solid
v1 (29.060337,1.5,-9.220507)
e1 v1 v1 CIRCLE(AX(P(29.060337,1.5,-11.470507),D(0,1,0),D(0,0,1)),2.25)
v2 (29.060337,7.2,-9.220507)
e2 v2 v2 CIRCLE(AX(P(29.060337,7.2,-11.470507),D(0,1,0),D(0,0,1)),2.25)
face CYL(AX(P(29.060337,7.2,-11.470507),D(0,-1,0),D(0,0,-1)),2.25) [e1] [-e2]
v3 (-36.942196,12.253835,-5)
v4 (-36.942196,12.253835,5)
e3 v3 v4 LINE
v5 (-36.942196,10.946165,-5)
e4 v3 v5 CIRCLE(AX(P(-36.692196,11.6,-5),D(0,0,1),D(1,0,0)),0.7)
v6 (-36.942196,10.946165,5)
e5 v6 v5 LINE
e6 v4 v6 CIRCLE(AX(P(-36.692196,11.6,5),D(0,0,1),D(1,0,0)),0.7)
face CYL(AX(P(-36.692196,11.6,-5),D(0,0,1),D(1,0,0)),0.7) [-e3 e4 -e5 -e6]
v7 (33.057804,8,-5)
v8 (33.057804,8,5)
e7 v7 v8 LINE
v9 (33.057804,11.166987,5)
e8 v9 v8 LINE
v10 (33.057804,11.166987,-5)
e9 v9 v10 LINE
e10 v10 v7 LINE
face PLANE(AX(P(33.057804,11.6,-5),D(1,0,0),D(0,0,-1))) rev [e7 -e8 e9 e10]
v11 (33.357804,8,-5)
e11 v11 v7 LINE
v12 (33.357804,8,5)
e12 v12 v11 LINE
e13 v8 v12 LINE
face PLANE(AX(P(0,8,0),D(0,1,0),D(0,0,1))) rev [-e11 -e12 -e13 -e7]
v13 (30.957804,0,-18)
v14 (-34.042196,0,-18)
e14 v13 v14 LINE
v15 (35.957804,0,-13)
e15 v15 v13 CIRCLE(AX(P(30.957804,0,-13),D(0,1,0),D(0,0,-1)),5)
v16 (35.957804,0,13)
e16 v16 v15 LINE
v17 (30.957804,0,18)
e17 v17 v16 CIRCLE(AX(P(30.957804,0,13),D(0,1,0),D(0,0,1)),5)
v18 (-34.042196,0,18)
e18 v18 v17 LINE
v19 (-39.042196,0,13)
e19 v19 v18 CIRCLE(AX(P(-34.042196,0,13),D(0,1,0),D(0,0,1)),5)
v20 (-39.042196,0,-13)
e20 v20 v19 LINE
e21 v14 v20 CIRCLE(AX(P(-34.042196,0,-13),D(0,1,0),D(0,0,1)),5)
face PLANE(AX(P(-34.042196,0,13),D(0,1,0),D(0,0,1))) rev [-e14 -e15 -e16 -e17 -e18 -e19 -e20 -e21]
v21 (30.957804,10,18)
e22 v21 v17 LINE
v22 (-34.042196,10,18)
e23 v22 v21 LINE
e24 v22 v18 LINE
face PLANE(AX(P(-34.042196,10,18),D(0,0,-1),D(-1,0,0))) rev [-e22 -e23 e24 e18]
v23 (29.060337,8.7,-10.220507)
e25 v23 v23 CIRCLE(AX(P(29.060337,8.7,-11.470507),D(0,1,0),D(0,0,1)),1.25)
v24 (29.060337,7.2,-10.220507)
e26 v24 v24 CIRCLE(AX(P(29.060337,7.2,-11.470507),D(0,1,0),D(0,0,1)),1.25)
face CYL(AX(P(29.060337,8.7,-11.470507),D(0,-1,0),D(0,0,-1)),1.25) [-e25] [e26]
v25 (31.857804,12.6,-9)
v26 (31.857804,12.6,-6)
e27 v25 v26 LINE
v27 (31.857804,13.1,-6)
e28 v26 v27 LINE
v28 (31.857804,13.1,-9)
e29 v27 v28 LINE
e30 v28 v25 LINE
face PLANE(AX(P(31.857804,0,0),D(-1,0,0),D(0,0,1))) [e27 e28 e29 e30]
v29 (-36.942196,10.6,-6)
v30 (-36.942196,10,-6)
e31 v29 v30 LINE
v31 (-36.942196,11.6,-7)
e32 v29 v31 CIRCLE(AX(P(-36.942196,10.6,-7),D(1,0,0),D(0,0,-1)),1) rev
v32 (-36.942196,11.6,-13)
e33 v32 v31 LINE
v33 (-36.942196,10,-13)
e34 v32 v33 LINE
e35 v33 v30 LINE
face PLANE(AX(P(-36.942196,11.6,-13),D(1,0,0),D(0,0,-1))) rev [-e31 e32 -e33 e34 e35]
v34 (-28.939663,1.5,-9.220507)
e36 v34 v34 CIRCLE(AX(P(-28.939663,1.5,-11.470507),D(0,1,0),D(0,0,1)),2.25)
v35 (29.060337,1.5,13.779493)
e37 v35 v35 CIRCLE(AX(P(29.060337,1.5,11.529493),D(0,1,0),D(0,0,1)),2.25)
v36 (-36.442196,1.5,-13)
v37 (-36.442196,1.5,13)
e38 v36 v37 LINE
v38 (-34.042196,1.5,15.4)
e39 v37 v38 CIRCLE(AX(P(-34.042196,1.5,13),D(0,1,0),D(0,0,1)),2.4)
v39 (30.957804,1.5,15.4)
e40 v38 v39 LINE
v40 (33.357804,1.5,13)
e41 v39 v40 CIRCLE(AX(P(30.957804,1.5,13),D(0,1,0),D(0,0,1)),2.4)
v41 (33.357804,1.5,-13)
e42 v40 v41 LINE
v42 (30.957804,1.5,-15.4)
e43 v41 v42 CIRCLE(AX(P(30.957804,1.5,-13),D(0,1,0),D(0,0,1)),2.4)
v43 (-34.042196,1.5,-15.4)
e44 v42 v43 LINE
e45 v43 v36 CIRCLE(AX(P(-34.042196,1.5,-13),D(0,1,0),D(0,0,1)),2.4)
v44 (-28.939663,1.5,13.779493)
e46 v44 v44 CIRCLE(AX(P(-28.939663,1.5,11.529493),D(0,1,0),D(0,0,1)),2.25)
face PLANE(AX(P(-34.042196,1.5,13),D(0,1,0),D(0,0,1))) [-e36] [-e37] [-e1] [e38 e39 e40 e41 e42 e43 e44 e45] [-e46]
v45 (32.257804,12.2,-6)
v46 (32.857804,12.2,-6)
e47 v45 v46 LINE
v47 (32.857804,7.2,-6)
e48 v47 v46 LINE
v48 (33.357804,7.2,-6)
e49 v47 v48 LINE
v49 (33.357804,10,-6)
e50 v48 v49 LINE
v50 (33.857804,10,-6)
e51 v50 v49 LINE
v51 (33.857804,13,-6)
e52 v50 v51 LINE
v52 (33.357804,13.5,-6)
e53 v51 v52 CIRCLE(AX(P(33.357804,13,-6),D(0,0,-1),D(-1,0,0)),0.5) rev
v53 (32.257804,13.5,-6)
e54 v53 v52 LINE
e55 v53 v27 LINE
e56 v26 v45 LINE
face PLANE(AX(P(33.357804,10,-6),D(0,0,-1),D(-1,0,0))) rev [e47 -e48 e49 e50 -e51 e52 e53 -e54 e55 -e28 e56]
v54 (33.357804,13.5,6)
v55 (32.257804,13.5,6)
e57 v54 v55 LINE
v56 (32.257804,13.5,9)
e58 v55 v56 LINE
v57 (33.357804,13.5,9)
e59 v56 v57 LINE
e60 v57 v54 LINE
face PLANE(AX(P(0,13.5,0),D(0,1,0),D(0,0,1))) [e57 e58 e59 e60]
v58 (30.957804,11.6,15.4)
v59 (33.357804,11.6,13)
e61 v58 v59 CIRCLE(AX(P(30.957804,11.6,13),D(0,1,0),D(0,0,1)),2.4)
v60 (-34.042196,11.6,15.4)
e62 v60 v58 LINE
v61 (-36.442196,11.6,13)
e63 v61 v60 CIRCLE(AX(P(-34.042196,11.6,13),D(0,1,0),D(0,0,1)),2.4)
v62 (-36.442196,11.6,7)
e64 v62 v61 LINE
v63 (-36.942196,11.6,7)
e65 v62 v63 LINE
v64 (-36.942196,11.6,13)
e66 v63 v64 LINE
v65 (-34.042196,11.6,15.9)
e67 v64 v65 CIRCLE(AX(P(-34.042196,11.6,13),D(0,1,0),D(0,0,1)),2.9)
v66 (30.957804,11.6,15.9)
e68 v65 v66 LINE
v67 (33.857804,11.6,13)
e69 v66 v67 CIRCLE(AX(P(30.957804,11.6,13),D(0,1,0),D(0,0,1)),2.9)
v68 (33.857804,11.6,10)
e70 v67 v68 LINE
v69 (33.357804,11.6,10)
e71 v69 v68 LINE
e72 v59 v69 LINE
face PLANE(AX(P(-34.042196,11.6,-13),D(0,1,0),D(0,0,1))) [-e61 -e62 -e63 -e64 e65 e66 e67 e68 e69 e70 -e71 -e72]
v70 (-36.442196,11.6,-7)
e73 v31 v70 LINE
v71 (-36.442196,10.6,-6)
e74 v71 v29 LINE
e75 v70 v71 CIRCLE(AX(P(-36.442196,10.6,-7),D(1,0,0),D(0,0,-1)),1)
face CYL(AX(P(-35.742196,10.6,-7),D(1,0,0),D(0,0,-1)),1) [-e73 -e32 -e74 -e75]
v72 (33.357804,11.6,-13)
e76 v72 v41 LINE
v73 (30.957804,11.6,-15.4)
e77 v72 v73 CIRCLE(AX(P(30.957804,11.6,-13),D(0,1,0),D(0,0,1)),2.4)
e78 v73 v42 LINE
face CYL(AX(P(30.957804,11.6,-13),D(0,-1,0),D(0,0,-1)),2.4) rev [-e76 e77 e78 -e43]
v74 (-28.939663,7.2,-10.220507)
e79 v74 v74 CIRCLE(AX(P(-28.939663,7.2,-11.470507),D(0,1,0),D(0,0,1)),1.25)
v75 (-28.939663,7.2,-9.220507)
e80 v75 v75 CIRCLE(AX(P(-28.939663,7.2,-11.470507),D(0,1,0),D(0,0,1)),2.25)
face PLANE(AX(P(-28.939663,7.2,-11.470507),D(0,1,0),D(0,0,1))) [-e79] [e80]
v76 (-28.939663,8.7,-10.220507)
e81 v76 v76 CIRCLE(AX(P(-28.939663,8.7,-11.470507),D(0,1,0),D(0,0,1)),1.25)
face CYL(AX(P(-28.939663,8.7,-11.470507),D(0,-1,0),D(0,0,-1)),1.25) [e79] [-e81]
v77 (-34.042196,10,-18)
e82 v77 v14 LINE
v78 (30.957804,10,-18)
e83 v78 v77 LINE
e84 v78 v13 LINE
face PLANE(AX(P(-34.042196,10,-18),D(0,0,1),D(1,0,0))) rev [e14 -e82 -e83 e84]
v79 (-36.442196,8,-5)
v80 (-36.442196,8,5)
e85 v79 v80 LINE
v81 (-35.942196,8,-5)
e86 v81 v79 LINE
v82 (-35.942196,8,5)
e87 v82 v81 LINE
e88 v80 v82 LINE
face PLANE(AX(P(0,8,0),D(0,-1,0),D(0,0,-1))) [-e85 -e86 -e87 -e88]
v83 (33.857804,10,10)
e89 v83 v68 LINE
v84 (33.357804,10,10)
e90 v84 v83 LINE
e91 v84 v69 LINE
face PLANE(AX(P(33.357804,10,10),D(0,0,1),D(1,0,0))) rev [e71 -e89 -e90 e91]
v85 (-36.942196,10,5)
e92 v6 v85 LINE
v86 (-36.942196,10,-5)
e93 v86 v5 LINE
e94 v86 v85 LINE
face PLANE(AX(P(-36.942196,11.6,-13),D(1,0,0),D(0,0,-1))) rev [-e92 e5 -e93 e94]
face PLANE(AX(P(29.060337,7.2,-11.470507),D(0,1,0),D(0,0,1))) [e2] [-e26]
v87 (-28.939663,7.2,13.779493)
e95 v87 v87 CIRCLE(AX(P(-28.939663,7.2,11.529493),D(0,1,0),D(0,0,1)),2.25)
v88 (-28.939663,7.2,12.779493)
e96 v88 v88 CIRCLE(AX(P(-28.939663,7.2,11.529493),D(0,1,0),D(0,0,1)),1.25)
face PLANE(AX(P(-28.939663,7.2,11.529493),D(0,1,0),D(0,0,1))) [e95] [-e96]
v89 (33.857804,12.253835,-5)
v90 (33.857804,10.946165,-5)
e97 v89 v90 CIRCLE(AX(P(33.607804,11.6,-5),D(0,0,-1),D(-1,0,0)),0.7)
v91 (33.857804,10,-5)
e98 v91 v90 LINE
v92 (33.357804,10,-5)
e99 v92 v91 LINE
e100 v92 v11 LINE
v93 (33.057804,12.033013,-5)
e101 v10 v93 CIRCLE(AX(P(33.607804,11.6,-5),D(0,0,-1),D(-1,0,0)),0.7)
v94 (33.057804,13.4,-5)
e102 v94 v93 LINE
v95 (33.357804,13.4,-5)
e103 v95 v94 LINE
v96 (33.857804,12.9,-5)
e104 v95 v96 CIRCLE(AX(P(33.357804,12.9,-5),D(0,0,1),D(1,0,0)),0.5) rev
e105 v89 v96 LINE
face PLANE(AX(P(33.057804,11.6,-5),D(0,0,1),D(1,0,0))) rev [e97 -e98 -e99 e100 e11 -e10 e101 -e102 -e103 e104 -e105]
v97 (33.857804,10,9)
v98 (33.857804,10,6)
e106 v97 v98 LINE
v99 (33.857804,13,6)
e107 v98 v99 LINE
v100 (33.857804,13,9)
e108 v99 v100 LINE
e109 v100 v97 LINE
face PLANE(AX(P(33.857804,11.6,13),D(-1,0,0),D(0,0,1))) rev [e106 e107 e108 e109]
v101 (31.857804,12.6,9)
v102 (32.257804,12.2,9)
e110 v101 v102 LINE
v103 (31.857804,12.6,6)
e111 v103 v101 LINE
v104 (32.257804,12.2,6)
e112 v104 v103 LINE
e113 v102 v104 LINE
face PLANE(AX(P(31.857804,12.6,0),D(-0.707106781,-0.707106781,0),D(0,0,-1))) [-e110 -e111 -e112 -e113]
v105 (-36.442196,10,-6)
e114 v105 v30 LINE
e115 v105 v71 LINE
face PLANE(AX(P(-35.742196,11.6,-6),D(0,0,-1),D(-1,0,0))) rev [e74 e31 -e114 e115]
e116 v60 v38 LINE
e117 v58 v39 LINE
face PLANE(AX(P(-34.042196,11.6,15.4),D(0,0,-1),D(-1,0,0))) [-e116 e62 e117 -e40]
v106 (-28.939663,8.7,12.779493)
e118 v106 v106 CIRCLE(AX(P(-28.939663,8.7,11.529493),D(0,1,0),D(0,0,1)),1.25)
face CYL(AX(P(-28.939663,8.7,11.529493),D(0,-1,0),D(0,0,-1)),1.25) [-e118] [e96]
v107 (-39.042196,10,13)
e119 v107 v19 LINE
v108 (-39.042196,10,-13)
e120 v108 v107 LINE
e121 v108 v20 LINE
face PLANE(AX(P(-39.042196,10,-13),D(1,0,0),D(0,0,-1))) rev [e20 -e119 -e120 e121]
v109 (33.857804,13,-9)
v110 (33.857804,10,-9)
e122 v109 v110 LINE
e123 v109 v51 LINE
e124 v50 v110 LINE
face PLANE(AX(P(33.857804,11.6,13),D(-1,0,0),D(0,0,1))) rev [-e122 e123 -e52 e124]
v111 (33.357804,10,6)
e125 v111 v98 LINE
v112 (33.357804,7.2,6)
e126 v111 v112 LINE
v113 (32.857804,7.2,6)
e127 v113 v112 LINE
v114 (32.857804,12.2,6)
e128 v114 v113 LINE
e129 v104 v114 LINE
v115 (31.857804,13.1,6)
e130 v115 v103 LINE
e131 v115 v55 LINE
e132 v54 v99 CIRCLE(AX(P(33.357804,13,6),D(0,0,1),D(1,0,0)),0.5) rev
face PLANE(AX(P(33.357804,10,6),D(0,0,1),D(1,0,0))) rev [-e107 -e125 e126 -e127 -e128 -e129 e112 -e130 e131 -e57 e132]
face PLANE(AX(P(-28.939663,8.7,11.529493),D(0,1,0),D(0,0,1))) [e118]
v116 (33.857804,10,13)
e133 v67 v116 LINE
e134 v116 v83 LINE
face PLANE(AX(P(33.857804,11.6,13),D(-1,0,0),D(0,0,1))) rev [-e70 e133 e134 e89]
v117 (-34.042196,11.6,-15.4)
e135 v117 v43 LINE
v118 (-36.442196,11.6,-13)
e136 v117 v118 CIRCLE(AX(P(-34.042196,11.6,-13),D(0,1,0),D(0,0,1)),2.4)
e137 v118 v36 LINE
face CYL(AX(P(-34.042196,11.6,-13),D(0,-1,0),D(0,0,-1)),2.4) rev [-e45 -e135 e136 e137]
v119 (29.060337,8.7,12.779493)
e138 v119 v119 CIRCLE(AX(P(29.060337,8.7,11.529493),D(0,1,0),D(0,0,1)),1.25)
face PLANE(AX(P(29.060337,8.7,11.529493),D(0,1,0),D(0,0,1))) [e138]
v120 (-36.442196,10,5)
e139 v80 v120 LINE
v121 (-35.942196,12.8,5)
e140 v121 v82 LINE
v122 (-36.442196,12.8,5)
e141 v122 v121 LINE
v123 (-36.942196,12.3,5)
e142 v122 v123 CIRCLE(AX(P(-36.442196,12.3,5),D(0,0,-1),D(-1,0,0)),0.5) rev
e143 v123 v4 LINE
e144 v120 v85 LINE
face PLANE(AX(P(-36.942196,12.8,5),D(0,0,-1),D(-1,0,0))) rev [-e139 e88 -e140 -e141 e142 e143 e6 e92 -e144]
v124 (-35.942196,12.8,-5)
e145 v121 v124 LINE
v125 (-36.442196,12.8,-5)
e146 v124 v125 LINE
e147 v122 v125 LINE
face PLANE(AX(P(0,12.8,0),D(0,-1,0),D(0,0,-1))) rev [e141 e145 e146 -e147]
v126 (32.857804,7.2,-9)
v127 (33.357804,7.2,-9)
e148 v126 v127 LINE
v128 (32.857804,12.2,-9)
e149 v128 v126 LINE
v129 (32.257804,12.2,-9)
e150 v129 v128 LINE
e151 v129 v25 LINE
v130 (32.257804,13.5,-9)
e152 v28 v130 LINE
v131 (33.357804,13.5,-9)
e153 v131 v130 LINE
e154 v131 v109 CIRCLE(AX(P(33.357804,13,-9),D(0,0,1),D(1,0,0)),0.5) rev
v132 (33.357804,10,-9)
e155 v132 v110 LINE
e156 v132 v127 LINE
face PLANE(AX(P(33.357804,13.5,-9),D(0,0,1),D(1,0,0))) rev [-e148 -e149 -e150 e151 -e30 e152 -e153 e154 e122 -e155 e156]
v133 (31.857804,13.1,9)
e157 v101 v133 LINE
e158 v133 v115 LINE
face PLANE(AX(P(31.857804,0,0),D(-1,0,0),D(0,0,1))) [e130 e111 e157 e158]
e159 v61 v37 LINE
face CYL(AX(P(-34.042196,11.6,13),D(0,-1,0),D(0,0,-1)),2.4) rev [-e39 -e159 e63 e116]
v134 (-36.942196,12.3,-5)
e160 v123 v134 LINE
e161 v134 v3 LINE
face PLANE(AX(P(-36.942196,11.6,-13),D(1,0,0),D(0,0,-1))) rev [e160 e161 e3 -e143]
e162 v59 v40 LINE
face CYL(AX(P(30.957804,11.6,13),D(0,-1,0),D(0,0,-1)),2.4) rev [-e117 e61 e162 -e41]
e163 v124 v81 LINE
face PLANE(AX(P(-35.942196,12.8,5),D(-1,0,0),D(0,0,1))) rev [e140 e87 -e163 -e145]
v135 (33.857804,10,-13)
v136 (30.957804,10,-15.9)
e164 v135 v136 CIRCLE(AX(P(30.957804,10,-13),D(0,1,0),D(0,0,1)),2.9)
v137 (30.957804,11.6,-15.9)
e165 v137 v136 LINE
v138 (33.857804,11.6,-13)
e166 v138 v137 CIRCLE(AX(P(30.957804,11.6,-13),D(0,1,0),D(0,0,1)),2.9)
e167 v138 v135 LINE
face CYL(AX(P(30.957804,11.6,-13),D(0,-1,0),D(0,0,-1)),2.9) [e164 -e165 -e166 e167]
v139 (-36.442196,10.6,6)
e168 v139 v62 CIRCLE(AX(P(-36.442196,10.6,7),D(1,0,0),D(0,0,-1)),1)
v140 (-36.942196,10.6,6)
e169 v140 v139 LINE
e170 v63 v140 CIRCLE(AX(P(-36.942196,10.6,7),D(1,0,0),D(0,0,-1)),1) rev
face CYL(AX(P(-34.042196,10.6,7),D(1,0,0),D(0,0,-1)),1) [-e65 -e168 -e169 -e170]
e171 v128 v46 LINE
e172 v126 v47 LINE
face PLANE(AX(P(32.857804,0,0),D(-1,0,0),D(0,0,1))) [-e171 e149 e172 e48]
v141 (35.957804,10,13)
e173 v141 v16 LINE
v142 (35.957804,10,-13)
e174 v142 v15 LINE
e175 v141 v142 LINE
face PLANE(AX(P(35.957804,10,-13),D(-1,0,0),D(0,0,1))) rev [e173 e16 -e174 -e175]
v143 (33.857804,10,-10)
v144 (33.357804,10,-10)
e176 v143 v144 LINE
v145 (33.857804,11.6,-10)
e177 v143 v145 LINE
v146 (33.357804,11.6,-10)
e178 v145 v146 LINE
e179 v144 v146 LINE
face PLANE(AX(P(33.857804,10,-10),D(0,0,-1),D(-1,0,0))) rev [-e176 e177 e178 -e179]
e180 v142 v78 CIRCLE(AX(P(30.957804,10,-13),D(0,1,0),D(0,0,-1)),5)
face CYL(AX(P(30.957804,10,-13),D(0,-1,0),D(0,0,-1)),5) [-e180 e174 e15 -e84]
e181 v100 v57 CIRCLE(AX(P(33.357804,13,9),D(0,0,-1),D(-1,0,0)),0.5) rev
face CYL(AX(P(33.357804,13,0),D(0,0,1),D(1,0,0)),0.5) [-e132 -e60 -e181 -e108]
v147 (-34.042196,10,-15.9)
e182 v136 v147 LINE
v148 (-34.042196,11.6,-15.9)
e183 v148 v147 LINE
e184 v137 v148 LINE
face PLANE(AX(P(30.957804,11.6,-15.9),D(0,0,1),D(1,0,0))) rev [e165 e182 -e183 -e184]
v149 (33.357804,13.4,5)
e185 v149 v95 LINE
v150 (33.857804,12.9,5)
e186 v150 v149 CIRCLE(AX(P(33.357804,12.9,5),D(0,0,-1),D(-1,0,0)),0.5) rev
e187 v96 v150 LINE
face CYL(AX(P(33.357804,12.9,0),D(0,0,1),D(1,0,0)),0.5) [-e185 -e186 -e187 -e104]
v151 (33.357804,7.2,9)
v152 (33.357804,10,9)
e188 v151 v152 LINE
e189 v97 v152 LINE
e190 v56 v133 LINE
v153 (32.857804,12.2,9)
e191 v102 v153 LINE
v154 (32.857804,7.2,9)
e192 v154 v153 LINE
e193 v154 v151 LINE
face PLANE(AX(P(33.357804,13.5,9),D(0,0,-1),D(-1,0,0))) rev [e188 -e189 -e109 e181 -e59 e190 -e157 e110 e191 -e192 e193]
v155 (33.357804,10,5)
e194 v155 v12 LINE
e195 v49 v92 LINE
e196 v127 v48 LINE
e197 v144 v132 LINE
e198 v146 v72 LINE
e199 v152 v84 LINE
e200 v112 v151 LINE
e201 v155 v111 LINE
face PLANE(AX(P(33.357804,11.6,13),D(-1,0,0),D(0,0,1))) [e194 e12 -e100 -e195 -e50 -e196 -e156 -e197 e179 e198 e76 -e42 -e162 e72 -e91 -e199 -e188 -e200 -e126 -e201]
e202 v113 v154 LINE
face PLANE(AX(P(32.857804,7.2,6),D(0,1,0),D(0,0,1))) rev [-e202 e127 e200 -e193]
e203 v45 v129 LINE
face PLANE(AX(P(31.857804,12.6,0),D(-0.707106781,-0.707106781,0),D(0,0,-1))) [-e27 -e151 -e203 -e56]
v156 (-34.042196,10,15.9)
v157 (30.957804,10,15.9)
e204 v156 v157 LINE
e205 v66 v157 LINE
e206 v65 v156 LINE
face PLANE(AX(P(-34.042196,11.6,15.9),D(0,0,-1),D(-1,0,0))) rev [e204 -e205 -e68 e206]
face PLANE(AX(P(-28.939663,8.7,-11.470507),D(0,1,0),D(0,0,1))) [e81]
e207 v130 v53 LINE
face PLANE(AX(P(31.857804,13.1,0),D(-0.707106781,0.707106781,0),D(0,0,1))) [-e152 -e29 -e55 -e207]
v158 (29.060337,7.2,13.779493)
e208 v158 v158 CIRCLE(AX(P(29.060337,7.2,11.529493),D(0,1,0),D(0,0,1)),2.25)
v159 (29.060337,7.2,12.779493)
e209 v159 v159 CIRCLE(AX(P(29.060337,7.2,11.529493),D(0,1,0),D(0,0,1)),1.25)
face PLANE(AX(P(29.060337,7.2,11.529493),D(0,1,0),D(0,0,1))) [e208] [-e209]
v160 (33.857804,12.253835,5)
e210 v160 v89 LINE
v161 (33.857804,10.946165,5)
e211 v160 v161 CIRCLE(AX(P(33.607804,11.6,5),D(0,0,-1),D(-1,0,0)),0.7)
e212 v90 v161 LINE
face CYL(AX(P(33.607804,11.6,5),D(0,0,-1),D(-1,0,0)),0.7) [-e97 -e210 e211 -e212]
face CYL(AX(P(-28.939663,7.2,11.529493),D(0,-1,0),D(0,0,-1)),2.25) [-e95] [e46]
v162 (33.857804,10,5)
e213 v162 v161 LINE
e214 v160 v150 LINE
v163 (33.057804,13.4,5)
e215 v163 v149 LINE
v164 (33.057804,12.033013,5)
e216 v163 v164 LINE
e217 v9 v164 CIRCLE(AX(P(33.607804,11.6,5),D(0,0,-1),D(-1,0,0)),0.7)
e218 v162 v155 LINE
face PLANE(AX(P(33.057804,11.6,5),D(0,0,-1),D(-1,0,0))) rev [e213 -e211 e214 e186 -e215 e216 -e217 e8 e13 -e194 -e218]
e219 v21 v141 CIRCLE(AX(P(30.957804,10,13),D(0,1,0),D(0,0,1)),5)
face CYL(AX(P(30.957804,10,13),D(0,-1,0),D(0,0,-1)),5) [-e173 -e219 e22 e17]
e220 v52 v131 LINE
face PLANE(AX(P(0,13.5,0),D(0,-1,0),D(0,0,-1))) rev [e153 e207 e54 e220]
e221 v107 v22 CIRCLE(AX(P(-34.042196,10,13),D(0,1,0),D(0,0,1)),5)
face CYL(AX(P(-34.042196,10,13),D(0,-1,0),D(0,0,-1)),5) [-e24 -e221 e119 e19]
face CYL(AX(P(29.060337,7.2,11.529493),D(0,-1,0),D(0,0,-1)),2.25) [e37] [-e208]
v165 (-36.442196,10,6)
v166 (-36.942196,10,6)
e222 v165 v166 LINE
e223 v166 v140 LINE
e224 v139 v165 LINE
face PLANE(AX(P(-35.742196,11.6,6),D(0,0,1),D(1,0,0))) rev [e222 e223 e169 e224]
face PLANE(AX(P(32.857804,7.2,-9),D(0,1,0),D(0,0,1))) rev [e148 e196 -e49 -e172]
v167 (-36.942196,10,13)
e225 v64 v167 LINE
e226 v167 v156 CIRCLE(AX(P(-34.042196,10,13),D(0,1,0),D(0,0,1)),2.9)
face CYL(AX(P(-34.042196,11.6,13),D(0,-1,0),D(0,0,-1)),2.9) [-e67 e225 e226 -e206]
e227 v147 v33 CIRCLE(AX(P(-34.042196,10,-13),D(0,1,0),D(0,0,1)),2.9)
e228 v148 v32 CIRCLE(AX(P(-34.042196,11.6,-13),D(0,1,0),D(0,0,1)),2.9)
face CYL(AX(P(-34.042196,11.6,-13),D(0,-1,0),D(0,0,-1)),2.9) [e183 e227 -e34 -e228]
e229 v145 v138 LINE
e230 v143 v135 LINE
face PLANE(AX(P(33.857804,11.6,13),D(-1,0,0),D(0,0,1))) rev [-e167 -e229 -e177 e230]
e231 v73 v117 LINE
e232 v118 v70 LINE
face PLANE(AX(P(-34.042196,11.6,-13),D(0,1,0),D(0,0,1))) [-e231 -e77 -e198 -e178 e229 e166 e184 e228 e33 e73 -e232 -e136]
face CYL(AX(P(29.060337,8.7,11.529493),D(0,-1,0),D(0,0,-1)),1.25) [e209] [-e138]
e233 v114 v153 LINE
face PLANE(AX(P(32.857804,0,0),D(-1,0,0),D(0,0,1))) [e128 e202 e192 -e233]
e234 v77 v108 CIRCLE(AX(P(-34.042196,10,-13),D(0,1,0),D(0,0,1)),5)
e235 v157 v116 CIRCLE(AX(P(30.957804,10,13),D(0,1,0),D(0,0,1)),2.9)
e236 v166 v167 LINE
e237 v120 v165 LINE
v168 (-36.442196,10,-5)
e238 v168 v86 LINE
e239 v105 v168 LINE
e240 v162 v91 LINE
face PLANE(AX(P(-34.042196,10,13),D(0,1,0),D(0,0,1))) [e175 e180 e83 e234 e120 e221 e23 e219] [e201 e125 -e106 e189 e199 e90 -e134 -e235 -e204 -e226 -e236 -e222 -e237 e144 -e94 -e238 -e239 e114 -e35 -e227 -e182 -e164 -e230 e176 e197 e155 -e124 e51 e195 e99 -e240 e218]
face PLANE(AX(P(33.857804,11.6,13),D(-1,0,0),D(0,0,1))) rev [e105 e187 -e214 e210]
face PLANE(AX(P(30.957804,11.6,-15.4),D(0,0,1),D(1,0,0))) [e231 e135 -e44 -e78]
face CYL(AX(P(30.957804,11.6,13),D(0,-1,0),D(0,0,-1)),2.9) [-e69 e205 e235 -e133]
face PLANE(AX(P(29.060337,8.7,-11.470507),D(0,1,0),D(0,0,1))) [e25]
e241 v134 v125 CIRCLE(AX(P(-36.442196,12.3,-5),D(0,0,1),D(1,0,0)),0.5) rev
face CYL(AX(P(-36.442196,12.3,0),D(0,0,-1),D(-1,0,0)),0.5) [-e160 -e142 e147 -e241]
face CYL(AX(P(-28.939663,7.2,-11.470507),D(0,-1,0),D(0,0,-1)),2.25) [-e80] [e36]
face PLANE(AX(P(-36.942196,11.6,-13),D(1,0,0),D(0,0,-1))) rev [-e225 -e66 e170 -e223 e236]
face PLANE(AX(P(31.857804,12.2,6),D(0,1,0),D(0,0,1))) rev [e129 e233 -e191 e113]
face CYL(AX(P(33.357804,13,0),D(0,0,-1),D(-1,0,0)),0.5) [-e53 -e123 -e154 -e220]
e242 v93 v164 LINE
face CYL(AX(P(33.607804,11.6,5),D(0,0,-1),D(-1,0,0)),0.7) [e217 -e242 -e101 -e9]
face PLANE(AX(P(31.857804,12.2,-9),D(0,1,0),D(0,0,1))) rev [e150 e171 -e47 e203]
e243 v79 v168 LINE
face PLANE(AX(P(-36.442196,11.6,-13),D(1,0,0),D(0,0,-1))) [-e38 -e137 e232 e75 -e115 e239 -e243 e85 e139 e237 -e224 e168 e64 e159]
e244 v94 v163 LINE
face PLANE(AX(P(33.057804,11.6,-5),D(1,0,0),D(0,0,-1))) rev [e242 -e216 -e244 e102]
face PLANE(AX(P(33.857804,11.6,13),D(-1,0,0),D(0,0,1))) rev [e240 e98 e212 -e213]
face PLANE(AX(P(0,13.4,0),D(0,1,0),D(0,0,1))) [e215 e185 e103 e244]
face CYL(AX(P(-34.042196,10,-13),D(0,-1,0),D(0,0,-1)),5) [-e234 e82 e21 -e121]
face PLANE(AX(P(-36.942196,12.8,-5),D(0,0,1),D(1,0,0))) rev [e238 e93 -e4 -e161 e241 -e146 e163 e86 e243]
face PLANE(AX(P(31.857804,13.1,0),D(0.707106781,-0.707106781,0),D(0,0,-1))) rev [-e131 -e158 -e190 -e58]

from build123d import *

# Parameters (mm, degrees)
EXTRUDE_2_DEPTH       = 10
EXTRUDE_4_DEPTH       = 1.6
SKETCH_7_W            = 0.5
SKETCH_7_H            = 10
EXTRUDE_8_DEPTH       = 2.8
SKETCH_8_R            = 0.7
EXTRUDE_9_DEPTH       = 10
FILLET_1_R            = 0.5
SKETCH_11_W           = 1
SKETCH_11_H           = 1.6
CUT_EXTRUDE_1_DEPTH   = 1.2
FILLET_2_R            = 1
SKETCH_13_W           = 0.5
SKETCH_13_H           = 10
EXTRUDE_10_DEPTH      = 2.8
CUT_EXTRUDE_START     = -8.5
CUT_EXTRUDE_2_DEPTH   = 8.5
SKETCH_13_2_W         = 0.5
SKETCH_13_2_H         = 10
EXTRUDE_11_DEPTH      = 2
EXTRUDE_12_DEPTH      = 1.6
EXTRUDE_12_DEPTH_BACK = 2
SKETCH_5_W            = 0.3
SKETCH_5_H            = 10
SKETCH_15_R           = 2.25
EXTRUDE_13_DEPTH      = 5.7
SKETCH_16_R           = 1.25
EXTRUDE_14_DEPTH      = 1.5
SKETCH_17_W           = 0.5
SKETCH_17_H           = 1
CUT_EXTRUDE_3_DEPTH   = 1.6
SKETCH_19_W           = 0.8
SKETCH_19_H           = 10
EXTRUDE_15_DEPTH      = 1.8
SKETCH_20_R           = 0.7
EXTRUDE_16_DEPTH      = 10
FILLET_4_R            = 0.5
SKETCH_21_W           = 0.5
SKETCH_21_H           = 3
EXTRUDE_17_DEPTH      = 1.9
SKETCH_22_W           = 3
SKETCH_22_H           = 6.3
EXTRUDE_23_DEPTH      = 0.5
FILLET_12_R           = 0.5
SKETCH_29_W           = 0.5
SKETCH_29_H           = 1
CUT_EXTRUDE_5_DEPTH   = 1.6
SKETCH_30_W           = 3
SKETCH_30_H           = 1.3
EXTRUDE_26_DEPTH      = 1
CHAMFER_7_SIZE        = 0.4


with BuildPart() as part:
    # case 2 → 凸台-拉伸2 (new body)
    with BuildSketch(Plane(origin=(0, 0, 0), x_dir=(1, 0, 0), z_dir=(0, 1, 0))):
        with BuildLine():
            Line((-34.042196447, 18), (30.957803553, 18))
            ThreePointArc((30.957803553, 18), (34.493337459, 16.535533906), (35.957803553, 13))
            Line((35.957803553, 13), (35.957803553, -13))
            ThreePointArc((35.957803553, -13), (34.493337459, -16.535533906), (30.957803553, -18))
            Line((30.957803553, -18), (-34.042196447, -18))
            ThreePointArc((-34.042196447, -18), (-37.577730353, -16.535533906), (-39.042196447, -13))
            Line((-39.042196447, -13), (-39.042196447, 13))
            ThreePointArc((-39.042196447, 13), (-37.577730353, 16.535533906), (-34.042196447, 18))
        make_face()
    extrude(amount=EXTRUDE_2_DEPTH)

    # 草图3 → 凸台-拉伸4 (add)
    with BuildSketch(Plane(origin=(0, 10, 0), x_dir=(1, 0, 0), z_dir=(0, 1, 0))):
        with BuildLine():
            Line((-36.942196447, 13), (-36.942196447, -13))
            ThreePointArc((-36.942196447, -13), (-36.092806113, -15.050609665), (-34.042196447, -15.9))
            Line((-34.042196447, -15.9), (30.957803553, -15.9))
            ThreePointArc((30.957803553, -15.9), (33.008413218, -15.050609665), (33.857803553, -13))
            Line((33.857803553, -13), (33.857803553, 13))
            ThreePointArc((33.857803553, 13), (33.008413218, 15.050609665), (30.957803553, 15.9))
            Line((30.957803553, 15.9), (-34.042196447, 15.9))
            ThreePointArc((-34.042196447, 15.9), (-36.092806113, 15.050609665), (-36.942196447, 13))
        make_face()
        with BuildLine():
            Line((-34.042196447, -15.4), (30.957803553, -15.4))
            ThreePointArc((30.957803553, -15.4), (32.654859828, -14.697056275), (33.357803553, -13))
            Line((33.357803553, -13), (33.357803553, 13))
            ThreePointArc((33.357803553, 13), (32.654859828, 14.697056275), (30.957803553, 15.4))
            Line((30.957803553, 15.4), (-34.042196447, 15.4))
            ThreePointArc((-34.042196447, 15.4), (-35.739252722, 14.697056275), (-36.442196447, 13))
            Line((-36.442196447, 13), (-36.442196447, -13))
            ThreePointArc((-36.442196447, -13), (-35.739252722, -14.697056275), (-34.042196447, -15.4))
        make_face(mode=Mode.SUBTRACT)
    extrude(amount=EXTRUDE_4_DEPTH)

    # 草图7 → 凸台-拉伸8 (add)
    with BuildSketch(Plane(origin=(0, 10, 0), x_dir=(1, 0, 0), z_dir=(0, 1, 0))):
        with Locations((-36.692196447, 0)):
            Rectangle(SKETCH_7_W, SKETCH_7_H)
    extrude(amount=EXTRUDE_8_DEPTH)

    # 草图8 → 凸台-拉伸9 (add)
    with BuildSketch(Plane.XY.offset(5)):
        with Locations((-36.692196447, 11.6)):
            Circle(SKETCH_8_R)
    extrude(amount=-EXTRUDE_9_DEPTH)

    # 圆角1
    fillet_1_edges = [part.edges().sort_by_distance(p)[0] for p in [
        (-36.942196447, 12.8, 0),
    ]]
    fillet(fillet_1_edges, radius=FILLET_1_R - 0.0001)  # a hair under: the kernel refuses the full size

    # 草图11 → 切除-拉伸1 (cut)
    with BuildSketch(Plane.ZY.offset(36.942196447)):
        with Locations((5.5, 10.8)):
            Rectangle(SKETCH_11_W, SKETCH_11_H)
        with Locations((-5.5, 10.8)):
            Rectangle(SKETCH_11_W, SKETCH_11_H)
    extrude(amount=-CUT_EXTRUDE_1_DEPTH, mode=Mode.SUBTRACT)

    # 圆角2
    fillet_2_edges = [part.edges().sort_by_distance(p)[0] for p in [
        (-36.692196447, 11.6, 6),
        (-36.692196447, 11.6, -6),
    ]]
    fillet(fillet_2_edges, radius=FILLET_2_R)

    # 草图13 → 凸台-拉伸10 (add)
    with BuildSketch(Plane(origin=(0, 10, 0), x_dir=(1, 0, 0), z_dir=(0, 1, 0))):
        with Locations((-36.192196447, 0)):
            Rectangle(SKETCH_13_W, SKETCH_13_H)
    extrude(amount=EXTRUDE_10_DEPTH)

    # 草图14 → 切除-拉伸2 (cut)
    with BuildSketch(Plane(origin=(0, 10, 0), x_dir=(1, 0, 0), z_dir=(0, 1, 0)).offset(CUT_EXTRUDE_START)):
        with BuildLine():
            Line((-34.042196447, -15.4), (30.957803553, -15.4))
            ThreePointArc((30.957803553, -15.4), (32.654859828, -14.697056275), (33.357803553, -13))
            Line((33.357803553, -13), (33.357803553, 13))
            ThreePointArc((33.357803553, 13), (32.654859828, 14.697056275), (30.957803553, 15.4))
            Line((30.957803553, 15.4), (-34.042196447, 15.4))
            ThreePointArc((-34.042196447, 15.4), (-35.739252722, 14.697056275), (-36.442196447, 13))
            Line((-36.442196447, 13), (-36.442196447, -13))
            ThreePointArc((-36.442196447, -13), (-35.739252722, -14.697056275), (-34.042196447, -15.4))
        make_face()
    extrude(amount=CUT_EXTRUDE_2_DEPTH, mode=Mode.SUBTRACT)

    # 草图13<2> → 凸台-拉伸11 (add)
    with BuildSketch(Plane(origin=(0, 10, 0), x_dir=(1, 0, 0), z_dir=(0, 1, 0))):
        with Locations((-36.192196447, 0)):
            Rectangle(SKETCH_13_2_W, SKETCH_13_2_H)
    extrude(amount=-EXTRUDE_11_DEPTH)

    # 草图5 → 凸台-拉伸12 (add, two sides: drawn at the far end of the back side and taken through both)
    with BuildSketch(Plane(origin=(0, 10, 0), x_dir=(1, 0, 0), z_dir=(0, 1, 0)).offset(-EXTRUDE_12_DEPTH_BACK)):
        with Locations((33.207803553, 0)):
            Rectangle(SKETCH_5_W, SKETCH_5_H)
    extrude(amount=EXTRUDE_12_DEPTH + EXTRUDE_12_DEPTH_BACK)

    # 草图15 → 凸台-拉伸13 (add)
    with BuildSketch(Plane(origin=(0, 1.5, 0), x_dir=(1, 0, 0), z_dir=(0, 1, 0))):
        with Locations(Location((29.060337171, -11.529492838, 0), (0, 0, 270))):
            Circle(SKETCH_15_R)
        with Locations(Location((-28.939662829, -11.529492838, 0), (0, 0, 270))):
            Circle(SKETCH_15_R)
        with Locations(Location((29.060337171, 11.470507162, 0), (0, 0, 270))):
            Circle(SKETCH_15_R)
        with Locations(Location((-28.939662829, 11.470507162, 0), (0, 0, 270))):
            Circle(SKETCH_15_R)
    extrude(amount=EXTRUDE_13_DEPTH)

    # 草图16 → 凸台-拉伸14 (add)
    with BuildSketch(Plane(origin=(0, 7.2, 0), x_dir=(1, 0, 0), z_dir=(0, 1, 0))):
        with Locations(Location((29.060337171, -11.529492838, 0), (0, 0, 270))):
            Circle(SKETCH_16_R)
        with Locations(Location((29.060337171, 11.470507162, 0), (0, 0, 270))):
            Circle(SKETCH_16_R)
        with Locations(Location((-28.939662829, -11.529492838, 0), (0, 0, 270))):
            Circle(SKETCH_16_R)
        with Locations(Location((-28.939662829, 11.470507162, 0), (0, 0, 270))):
            Circle(SKETCH_16_R)
    extrude(amount=EXTRUDE_14_DEPTH)

    # 草图17 → 切除-拉伸3 (cut)
    with BuildSketch(Plane(origin=(0, 11.6, 0), x_dir=(1, 0, 0), z_dir=(0, 1, 0))):
        with Locations((33.607803553, -5.5)):
            Rectangle(SKETCH_17_W, SKETCH_17_H)
        with Locations((33.607803553, 5.5)):
            Rectangle(SKETCH_17_W, SKETCH_17_H)
    extrude(amount=-CUT_EXTRUDE_3_DEPTH, mode=Mode.SUBTRACT)

    # 草图19 → 凸台-拉伸15 (add)
    with BuildSketch(Plane(origin=(0, 11.6, 0), x_dir=(1, 0, 0), z_dir=(0, 1, 0))):
        with Locations((33.457803553, 0)):
            Rectangle(SKETCH_19_W, SKETCH_19_H)
    extrude(amount=EXTRUDE_15_DEPTH)

    # 草图20 → 凸台-拉伸16 (add)
    with BuildSketch(Plane(origin=(0, 0, -5), x_dir=(-1, 0, 0), z_dir=(0, 0, -1))):
        with Locations((-33.607803553, 11.6)):
            Circle(SKETCH_20_R)
    extrude(amount=-EXTRUDE_16_DEPTH)

    # 圆角4
    fillet_4_edges = [part.edges().sort_by_distance(p)[0] for p in [
        (33.857803553, 13.4, 0),
    ]]
    fillet(fillet_4_edges, radius=FILLET_4_R)

    # 草图21 → 凸台-拉伸17 (add)
    with BuildSketch(Plane(origin=(0, 11.6, 0), x_dir=(1, 0, 0), z_dir=(0, 1, 0))):
        with Locations((33.607803553, -7.5)):
            Rectangle(SKETCH_21_W, SKETCH_21_H)
        with Locations((33.607803553, 7.5)):
            Rectangle(SKETCH_21_W, SKETCH_21_H)
    extrude(amount=EXTRUDE_17_DEPTH)

    # 草图22 → 凸台-拉伸23 (add)
    with BuildSketch(Plane.ZY.offset(-33.357803553)):
        with Locations((-7.5, 10.35)):
            Rectangle(SKETCH_22_W, SKETCH_22_H)
        with Locations((7.5, 10.35)):
            Rectangle(SKETCH_22_W, SKETCH_22_H)
    extrude(amount=EXTRUDE_23_DEPTH)

    # 圆角12
    fillet_12_edges = [part.edges().sort_by_distance(p)[0] for p in [
        (33.857803553, 13.5, 7.5),
        (33.857803553, 13.5, -7.5),
    ]]
    fillet(fillet_12_edges, radius=FILLET_12_R)

    # 草图29 → 切除-拉伸5 (cut)
    with BuildSketch(Plane(origin=(0, 11.6, 0), x_dir=(1, 0, 0), z_dir=(0, 1, 0))):
        with Locations((33.607803553, -9.5)):
            Rectangle(SKETCH_29_W, SKETCH_29_H)
        with Locations((33.607803553, 9.5)):
            Rectangle(SKETCH_29_W, SKETCH_29_H)
    extrude(amount=-CUT_EXTRUDE_5_DEPTH, mode=Mode.SUBTRACT)

    # 草图30 → 凸台-拉伸26 (add)
    with BuildSketch(Plane.ZY.offset(-32.857803553)):
        with Locations((7.5, 12.85)):
            Rectangle(SKETCH_30_W, SKETCH_30_H)
        with Locations((-7.5, 12.85)):
            Rectangle(SKETCH_30_W, SKETCH_30_H)
    extrude(amount=EXTRUDE_26_DEPTH)

    # 倒角7
    chamfer_7_edges = [part.edges().sort_by_distance(p)[0] for p in [
        (31.857803553, 12.2, 7.5),
        (31.857803553, 13.5, 7.5),
        (31.857803553, 12.2, -7.5),
        (31.857803553, 13.5, -7.5),
    ]]
    chamfer(chamfer_7_edges, length=CHAMFER_7_SIZE)


solid = part.part
